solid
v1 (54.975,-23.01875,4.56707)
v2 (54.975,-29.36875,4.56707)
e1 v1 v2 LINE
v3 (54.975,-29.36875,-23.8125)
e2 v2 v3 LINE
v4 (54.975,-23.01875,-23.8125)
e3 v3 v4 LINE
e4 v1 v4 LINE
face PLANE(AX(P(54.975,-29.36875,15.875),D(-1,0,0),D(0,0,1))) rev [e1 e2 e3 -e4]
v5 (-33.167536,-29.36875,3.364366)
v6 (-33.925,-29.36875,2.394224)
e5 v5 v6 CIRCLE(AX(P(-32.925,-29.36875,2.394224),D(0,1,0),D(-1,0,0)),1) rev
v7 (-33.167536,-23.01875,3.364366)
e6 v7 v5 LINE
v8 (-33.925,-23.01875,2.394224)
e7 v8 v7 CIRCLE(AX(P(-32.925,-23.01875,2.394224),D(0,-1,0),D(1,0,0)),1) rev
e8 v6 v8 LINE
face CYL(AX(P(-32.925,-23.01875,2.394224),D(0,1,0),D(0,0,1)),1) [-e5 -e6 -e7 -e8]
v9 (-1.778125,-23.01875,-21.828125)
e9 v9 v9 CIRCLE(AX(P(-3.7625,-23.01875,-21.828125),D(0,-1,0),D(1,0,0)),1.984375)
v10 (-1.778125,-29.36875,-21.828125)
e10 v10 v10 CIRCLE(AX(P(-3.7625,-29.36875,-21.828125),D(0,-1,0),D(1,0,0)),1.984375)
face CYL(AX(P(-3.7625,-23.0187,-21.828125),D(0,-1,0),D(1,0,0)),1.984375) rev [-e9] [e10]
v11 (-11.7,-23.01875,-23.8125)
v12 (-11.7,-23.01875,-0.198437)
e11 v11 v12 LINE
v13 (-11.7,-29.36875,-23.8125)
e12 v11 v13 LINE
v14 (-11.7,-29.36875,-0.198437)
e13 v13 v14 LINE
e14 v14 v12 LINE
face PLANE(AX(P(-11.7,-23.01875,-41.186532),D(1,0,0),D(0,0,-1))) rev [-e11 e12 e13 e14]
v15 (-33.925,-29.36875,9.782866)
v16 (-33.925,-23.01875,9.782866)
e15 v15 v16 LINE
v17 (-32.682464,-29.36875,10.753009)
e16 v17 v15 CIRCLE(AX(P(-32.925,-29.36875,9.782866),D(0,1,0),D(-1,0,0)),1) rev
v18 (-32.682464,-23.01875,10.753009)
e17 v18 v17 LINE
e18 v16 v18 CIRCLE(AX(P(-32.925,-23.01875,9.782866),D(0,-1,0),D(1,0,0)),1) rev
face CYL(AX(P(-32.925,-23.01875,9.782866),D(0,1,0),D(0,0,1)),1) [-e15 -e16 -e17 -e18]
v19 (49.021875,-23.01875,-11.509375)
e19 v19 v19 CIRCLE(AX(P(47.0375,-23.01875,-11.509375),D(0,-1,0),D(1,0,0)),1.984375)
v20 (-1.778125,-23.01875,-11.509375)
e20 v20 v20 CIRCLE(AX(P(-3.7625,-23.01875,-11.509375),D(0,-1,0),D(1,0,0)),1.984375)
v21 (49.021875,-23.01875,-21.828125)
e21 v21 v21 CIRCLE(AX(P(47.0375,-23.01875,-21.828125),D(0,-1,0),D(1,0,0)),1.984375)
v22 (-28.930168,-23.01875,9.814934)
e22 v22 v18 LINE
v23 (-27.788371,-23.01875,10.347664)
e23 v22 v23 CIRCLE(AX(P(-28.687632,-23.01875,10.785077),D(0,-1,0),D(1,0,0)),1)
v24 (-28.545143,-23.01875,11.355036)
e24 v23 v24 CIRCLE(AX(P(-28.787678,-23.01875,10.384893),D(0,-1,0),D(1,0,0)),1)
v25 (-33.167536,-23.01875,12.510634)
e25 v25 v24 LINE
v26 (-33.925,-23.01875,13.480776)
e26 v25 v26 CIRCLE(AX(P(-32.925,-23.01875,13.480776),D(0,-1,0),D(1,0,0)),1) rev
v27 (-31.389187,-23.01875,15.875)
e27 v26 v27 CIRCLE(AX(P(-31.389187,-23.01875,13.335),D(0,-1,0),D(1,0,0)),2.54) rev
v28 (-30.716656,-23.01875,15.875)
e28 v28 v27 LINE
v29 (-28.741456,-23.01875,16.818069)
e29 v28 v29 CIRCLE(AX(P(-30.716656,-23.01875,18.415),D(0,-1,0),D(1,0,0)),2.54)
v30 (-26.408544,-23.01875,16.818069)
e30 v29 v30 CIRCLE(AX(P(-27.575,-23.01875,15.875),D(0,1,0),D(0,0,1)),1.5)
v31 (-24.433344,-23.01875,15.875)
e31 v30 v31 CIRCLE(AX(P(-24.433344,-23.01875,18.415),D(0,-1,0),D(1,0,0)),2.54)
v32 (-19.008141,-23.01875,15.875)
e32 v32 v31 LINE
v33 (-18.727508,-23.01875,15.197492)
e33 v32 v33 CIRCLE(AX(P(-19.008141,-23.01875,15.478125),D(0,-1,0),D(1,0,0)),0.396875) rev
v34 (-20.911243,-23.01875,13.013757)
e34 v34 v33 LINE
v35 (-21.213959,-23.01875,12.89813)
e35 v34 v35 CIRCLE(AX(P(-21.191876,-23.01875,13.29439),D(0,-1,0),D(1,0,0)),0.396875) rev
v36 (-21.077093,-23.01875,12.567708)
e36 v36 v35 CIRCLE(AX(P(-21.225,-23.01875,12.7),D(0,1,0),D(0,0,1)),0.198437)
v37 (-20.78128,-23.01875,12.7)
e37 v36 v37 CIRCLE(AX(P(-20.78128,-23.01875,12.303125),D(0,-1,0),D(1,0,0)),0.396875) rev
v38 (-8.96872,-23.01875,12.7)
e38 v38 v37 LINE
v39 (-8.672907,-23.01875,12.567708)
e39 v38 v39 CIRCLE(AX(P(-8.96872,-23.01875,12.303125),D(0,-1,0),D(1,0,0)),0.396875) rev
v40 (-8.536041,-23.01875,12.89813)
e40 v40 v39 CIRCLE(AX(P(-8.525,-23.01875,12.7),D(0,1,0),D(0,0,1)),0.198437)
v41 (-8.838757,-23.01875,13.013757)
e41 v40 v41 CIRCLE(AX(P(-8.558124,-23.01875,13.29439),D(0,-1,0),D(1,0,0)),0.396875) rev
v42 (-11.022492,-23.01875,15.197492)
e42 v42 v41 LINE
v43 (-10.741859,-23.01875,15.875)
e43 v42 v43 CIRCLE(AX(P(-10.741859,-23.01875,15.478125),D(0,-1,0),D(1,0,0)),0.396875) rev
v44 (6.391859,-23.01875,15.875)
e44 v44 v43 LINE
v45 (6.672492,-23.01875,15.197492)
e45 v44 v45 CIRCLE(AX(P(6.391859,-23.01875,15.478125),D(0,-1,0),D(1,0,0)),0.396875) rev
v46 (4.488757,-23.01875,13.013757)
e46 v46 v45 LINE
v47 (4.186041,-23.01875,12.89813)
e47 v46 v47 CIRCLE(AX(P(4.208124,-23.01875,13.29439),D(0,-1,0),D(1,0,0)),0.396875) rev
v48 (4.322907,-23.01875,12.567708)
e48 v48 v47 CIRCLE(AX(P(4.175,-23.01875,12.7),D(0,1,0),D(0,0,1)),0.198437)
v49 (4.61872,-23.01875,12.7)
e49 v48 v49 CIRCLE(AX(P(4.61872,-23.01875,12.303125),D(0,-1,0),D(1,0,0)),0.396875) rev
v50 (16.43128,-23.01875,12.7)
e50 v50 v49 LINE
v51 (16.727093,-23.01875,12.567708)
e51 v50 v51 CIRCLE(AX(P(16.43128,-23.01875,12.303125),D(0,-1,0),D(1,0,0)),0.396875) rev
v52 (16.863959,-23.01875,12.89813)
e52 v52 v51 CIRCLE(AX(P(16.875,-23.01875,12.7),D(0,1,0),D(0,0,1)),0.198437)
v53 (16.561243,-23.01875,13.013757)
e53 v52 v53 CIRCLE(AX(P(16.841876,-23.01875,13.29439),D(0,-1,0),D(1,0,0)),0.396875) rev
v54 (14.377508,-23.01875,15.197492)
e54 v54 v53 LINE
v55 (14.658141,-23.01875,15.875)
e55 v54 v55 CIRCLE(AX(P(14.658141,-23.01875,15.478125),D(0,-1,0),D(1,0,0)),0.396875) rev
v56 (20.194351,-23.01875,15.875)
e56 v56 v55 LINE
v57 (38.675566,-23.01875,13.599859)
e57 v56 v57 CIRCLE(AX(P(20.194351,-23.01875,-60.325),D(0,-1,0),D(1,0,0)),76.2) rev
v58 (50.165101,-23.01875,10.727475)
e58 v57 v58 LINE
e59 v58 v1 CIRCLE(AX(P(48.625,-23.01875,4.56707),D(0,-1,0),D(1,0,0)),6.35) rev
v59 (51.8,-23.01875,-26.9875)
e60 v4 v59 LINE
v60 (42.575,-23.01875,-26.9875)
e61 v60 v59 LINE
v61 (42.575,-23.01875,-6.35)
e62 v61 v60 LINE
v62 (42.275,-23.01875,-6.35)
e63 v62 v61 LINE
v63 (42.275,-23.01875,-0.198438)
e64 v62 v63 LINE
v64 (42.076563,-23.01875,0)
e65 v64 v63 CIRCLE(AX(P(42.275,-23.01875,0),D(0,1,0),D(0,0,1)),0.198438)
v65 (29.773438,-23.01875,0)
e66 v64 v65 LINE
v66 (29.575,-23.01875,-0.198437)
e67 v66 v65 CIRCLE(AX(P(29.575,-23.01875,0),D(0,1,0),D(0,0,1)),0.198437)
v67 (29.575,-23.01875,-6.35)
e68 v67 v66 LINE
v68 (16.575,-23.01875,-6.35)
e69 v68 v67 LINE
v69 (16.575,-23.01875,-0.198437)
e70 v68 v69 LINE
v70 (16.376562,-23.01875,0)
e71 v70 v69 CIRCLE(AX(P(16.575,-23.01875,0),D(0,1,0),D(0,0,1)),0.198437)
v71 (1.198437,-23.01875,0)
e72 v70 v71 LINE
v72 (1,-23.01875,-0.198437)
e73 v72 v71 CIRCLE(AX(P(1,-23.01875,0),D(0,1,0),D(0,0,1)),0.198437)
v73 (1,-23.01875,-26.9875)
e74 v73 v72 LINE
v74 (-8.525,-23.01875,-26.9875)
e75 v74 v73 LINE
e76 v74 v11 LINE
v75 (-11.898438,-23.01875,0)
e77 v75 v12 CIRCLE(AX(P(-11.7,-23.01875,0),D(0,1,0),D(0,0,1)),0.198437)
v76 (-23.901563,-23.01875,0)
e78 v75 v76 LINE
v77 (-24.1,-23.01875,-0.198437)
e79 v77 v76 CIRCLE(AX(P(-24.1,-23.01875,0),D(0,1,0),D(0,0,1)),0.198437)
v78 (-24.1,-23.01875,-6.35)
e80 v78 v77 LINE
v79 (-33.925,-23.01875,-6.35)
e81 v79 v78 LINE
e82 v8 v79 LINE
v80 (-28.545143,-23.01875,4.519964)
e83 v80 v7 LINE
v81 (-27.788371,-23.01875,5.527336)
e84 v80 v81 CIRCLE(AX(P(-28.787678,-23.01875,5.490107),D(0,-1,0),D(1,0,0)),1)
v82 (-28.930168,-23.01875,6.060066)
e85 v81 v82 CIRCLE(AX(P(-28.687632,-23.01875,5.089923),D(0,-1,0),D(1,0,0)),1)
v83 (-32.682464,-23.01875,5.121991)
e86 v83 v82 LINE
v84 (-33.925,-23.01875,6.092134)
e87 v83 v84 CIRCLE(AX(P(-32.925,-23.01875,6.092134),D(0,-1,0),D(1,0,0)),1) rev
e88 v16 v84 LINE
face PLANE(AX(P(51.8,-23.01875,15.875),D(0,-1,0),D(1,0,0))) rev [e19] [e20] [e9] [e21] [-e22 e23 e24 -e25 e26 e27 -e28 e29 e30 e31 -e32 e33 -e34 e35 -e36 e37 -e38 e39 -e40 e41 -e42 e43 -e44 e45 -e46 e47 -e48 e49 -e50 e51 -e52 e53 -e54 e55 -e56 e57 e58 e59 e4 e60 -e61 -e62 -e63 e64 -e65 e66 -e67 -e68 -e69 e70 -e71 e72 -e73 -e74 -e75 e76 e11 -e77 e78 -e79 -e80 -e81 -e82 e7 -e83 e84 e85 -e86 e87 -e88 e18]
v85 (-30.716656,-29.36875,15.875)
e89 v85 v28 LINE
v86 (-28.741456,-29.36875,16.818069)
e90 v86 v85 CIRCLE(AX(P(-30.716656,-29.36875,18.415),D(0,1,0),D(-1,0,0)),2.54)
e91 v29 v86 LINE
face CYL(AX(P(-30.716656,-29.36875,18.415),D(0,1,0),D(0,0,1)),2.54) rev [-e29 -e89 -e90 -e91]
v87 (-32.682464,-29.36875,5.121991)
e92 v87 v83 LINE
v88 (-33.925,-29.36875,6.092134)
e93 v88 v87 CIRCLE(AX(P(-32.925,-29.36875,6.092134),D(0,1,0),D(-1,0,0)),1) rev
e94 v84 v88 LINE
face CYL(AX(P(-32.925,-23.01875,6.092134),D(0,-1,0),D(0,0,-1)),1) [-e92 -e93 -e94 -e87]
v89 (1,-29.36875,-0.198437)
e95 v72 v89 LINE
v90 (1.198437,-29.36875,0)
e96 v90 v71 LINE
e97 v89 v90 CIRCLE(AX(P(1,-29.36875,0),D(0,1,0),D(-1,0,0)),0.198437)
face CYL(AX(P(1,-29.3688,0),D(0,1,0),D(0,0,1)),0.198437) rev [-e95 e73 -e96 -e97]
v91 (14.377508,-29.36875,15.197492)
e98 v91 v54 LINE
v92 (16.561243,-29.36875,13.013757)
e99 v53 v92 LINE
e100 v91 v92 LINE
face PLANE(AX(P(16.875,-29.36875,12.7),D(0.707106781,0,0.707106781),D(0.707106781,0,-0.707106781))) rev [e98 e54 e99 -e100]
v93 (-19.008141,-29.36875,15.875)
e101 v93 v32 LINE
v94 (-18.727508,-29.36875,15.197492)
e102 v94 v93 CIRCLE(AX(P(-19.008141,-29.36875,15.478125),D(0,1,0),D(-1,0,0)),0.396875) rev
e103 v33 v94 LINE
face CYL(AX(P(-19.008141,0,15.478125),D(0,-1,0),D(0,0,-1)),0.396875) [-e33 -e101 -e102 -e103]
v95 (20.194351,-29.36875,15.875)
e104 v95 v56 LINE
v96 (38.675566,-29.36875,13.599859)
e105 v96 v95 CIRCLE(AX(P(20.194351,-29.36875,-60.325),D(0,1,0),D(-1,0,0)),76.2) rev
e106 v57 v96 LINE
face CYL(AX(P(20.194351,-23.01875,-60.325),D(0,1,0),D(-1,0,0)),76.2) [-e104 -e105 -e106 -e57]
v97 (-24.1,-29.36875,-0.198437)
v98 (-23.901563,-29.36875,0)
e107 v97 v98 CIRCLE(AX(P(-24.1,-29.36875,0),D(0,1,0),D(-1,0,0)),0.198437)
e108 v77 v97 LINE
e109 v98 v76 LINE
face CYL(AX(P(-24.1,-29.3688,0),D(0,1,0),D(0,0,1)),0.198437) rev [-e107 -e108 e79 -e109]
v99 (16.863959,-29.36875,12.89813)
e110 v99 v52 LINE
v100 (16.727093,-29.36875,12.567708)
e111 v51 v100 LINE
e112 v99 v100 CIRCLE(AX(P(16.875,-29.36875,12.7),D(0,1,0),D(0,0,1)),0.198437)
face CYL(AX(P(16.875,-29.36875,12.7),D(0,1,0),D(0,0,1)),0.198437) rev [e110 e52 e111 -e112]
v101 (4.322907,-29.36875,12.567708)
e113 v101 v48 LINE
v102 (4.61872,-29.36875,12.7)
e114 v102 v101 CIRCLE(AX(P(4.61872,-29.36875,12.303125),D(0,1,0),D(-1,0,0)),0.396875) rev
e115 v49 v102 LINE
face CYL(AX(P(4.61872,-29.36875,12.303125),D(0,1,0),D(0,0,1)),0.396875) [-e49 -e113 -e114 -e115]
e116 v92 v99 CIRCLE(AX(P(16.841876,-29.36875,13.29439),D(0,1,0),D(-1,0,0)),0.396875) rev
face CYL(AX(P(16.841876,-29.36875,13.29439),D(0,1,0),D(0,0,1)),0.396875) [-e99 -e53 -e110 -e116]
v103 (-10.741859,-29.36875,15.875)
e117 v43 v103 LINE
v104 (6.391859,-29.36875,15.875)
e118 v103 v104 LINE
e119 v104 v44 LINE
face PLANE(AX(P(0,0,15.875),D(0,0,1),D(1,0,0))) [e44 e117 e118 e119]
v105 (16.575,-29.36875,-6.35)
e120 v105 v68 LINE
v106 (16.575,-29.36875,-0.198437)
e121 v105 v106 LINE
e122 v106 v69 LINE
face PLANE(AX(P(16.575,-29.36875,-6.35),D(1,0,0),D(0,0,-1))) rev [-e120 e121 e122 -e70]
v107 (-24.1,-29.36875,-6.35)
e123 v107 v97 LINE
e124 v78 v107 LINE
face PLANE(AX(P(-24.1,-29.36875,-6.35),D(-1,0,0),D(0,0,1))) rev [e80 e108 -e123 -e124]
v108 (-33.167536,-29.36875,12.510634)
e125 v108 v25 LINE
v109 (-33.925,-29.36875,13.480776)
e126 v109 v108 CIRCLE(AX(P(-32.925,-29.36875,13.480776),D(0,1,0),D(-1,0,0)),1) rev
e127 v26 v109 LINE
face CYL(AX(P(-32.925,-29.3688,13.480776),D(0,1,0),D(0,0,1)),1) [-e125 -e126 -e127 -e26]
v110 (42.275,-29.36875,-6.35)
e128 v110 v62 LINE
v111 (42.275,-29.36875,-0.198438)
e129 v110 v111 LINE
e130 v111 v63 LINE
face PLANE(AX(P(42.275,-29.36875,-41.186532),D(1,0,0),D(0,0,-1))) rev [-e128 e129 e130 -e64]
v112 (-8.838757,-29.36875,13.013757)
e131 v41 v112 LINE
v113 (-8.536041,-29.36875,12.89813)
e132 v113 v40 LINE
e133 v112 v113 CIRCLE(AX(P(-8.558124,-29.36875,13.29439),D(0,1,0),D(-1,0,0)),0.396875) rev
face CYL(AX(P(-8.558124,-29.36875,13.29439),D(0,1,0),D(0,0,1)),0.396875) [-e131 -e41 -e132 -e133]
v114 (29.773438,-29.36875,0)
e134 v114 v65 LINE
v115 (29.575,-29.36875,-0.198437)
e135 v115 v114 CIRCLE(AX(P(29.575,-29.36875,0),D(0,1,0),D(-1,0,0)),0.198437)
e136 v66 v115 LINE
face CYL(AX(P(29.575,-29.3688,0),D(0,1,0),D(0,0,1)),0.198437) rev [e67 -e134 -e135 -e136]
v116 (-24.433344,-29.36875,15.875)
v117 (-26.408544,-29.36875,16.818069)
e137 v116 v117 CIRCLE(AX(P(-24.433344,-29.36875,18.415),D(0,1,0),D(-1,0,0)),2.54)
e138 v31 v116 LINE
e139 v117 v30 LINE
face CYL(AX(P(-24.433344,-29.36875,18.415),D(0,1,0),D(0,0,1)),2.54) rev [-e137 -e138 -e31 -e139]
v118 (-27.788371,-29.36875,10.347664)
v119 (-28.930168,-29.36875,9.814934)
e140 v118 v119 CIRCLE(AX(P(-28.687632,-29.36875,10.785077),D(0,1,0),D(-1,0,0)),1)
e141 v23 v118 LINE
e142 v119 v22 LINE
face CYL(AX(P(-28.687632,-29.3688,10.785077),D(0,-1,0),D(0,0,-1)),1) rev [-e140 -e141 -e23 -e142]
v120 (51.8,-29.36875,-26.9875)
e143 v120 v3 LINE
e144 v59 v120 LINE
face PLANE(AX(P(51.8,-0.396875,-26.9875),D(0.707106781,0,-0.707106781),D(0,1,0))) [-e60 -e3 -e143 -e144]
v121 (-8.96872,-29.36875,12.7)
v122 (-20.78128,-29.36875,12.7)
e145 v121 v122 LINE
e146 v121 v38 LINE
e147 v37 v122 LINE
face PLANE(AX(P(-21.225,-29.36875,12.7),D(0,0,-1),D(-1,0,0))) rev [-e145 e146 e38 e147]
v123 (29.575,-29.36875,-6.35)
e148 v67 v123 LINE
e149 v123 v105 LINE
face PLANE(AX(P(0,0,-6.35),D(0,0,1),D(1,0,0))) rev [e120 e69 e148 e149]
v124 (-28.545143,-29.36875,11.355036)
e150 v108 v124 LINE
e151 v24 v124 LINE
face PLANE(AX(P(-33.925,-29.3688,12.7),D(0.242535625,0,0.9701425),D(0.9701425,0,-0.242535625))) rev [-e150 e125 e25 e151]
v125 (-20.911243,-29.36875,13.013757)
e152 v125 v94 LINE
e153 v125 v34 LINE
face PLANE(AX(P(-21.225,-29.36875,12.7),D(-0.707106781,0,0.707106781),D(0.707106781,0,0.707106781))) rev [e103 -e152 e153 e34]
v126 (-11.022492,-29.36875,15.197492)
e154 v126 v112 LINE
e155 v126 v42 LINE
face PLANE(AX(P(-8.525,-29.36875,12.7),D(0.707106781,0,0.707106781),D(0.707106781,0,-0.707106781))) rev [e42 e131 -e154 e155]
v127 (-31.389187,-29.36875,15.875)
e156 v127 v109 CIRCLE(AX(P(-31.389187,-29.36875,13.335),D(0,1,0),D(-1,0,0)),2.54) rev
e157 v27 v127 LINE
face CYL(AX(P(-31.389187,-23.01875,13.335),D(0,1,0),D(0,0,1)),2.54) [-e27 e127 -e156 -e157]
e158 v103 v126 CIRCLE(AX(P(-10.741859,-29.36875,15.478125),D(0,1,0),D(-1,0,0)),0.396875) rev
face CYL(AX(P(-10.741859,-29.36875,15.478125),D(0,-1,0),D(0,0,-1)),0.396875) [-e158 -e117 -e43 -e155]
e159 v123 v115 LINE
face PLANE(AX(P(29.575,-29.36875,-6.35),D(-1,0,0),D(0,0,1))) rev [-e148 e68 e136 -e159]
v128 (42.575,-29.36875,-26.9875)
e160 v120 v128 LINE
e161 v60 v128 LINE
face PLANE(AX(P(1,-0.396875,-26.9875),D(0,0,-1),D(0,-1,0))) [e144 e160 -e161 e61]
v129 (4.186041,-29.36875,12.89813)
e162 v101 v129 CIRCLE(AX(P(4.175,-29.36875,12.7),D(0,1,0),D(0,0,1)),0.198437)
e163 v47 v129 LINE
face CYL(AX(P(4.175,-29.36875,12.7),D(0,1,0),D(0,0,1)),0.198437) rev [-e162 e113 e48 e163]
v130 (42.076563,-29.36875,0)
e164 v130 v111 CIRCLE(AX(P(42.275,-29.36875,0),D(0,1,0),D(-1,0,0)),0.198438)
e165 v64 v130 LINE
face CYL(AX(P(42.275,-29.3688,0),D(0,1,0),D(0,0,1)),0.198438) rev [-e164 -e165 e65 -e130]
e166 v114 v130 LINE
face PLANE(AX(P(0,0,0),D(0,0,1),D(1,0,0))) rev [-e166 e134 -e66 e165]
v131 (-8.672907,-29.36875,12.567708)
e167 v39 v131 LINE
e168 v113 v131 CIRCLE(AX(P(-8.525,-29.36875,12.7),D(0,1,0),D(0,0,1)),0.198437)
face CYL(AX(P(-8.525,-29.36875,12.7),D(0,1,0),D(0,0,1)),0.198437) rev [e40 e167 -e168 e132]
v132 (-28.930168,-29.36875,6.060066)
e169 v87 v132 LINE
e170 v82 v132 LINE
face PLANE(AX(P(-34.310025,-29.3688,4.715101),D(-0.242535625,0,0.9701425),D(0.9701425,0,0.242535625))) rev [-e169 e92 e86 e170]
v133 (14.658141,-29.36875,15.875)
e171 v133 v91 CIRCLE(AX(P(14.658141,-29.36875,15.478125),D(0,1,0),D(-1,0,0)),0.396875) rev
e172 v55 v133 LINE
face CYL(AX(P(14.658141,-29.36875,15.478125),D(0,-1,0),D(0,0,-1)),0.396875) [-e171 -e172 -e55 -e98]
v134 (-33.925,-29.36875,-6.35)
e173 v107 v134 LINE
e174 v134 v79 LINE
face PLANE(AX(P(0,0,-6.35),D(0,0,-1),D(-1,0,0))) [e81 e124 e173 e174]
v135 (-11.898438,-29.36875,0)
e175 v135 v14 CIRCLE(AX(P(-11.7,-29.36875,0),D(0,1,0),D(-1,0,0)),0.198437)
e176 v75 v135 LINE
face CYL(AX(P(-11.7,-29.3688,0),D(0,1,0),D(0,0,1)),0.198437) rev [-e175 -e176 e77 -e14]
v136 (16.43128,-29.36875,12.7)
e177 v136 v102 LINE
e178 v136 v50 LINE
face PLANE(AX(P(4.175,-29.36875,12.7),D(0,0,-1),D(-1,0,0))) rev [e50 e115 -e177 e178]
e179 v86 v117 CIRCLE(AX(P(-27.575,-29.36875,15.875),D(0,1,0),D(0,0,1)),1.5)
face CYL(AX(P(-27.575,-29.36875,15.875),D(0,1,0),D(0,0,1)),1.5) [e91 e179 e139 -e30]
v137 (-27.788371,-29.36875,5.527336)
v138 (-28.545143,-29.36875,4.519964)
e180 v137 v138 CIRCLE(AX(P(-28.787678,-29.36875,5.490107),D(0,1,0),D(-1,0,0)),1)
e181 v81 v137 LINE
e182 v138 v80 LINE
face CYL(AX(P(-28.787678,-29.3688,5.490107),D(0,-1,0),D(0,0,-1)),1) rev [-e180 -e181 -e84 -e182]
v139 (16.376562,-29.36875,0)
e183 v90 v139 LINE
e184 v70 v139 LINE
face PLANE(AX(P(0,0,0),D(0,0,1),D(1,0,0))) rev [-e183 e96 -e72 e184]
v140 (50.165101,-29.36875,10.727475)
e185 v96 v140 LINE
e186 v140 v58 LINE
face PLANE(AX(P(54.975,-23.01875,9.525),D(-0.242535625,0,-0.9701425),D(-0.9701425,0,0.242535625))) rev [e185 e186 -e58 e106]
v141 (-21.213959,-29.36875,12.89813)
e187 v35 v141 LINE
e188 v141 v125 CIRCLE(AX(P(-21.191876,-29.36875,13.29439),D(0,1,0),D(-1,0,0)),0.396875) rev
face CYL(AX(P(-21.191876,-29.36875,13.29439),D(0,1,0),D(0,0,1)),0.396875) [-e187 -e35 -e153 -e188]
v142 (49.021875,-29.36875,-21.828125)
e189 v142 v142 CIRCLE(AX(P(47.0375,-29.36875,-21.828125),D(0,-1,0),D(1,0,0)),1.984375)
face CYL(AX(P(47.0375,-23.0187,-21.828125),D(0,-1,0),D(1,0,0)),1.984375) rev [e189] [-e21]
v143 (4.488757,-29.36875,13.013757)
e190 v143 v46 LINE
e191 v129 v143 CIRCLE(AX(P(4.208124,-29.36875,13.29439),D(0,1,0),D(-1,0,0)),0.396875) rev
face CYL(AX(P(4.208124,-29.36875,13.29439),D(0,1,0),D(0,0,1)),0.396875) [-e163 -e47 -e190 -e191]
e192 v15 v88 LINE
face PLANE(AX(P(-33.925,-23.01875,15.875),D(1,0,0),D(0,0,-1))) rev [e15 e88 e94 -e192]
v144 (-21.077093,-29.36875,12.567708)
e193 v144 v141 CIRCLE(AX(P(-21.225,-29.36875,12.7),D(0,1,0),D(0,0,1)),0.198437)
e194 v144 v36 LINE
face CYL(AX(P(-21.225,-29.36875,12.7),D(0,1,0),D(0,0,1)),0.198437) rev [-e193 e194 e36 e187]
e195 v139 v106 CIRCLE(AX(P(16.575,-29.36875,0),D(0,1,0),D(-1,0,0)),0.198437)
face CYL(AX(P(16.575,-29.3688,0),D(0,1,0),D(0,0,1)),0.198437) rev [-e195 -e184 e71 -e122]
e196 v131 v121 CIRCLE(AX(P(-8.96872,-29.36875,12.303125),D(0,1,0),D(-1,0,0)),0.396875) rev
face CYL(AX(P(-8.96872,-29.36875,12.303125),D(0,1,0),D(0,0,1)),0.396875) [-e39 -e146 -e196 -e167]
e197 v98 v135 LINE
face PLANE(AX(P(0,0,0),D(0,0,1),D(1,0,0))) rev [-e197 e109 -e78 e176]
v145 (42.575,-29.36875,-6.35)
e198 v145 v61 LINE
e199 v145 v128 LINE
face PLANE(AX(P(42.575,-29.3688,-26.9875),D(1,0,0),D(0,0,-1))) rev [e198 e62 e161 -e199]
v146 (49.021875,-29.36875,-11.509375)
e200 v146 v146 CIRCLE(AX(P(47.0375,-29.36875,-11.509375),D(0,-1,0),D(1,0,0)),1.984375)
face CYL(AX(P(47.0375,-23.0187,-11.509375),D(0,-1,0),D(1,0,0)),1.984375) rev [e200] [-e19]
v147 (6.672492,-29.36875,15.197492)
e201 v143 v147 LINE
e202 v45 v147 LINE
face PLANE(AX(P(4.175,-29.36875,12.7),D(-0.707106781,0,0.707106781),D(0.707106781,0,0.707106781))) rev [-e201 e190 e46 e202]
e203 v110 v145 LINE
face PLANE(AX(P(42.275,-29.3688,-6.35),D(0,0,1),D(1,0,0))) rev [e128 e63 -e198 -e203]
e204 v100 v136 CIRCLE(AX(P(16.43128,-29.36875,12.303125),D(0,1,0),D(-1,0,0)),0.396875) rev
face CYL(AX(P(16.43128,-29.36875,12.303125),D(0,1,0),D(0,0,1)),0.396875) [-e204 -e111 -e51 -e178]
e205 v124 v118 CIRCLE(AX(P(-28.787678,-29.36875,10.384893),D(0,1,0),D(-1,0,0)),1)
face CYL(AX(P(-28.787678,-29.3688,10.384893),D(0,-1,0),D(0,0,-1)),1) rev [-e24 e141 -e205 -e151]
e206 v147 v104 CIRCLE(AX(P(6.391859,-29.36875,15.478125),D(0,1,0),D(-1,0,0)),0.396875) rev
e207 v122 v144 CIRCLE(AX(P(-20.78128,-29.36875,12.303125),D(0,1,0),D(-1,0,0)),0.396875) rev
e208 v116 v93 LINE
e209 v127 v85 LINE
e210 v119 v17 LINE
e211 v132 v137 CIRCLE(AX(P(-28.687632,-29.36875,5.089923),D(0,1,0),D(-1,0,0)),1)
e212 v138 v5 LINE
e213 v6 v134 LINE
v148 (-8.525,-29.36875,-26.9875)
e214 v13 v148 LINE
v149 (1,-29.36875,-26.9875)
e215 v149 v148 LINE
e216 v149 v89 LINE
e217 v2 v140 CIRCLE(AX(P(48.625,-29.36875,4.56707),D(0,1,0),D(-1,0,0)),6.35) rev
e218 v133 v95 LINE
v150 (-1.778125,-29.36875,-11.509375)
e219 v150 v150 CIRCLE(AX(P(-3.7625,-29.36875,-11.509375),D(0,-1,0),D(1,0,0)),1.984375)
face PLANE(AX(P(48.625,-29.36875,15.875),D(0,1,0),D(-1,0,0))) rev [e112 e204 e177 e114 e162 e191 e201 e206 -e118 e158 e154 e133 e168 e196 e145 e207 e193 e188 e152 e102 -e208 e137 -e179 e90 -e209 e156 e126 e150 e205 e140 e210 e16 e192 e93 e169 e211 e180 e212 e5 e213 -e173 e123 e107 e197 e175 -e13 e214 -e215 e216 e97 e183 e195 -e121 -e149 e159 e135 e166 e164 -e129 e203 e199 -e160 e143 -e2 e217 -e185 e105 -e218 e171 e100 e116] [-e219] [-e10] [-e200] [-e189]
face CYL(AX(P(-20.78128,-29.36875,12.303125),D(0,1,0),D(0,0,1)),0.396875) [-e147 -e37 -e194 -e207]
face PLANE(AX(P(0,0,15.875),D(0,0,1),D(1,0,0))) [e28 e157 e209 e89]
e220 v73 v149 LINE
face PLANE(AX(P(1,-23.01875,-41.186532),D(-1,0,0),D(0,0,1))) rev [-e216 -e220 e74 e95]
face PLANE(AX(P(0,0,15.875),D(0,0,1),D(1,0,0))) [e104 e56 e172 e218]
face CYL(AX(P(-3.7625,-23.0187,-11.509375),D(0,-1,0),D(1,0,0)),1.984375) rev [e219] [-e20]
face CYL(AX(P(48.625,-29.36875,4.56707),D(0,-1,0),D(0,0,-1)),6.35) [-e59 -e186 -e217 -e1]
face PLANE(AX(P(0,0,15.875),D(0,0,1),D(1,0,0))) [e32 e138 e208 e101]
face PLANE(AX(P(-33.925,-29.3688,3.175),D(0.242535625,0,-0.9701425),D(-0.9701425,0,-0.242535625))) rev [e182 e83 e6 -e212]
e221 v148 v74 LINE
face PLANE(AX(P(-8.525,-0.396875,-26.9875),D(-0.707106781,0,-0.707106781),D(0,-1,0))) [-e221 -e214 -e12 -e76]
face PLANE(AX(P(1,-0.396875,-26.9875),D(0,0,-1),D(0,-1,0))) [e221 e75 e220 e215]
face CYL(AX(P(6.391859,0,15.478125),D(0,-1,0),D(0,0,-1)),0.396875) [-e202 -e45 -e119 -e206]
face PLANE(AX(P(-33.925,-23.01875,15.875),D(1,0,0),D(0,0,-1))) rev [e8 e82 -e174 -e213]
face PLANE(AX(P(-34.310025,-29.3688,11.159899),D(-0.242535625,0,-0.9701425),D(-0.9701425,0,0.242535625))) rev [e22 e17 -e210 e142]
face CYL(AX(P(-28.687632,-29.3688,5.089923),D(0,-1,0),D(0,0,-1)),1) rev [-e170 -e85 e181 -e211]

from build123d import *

# Parameters (mm, degrees)
BOSS_EXTRUDE1_DEPTH = 15.875
SKETCH3_W           = 12.7
SKETCH3_H           = 6.35
BOSS_EXTRUDE2_DEPTH = 26.9875
SKETCH5_R           = 1.5
BOSS_EXTRUDE4_DEPTH = 6.35
FILLET1_R           = 2.54
CUT_EXTRUDE1_DEPTH  = 62.570271083
FILLET3_R           = 1
CUT_EXTRUDE2_DEPTH  = 6.35
FILLET4_R           = 6.35
FILLET5_R           = 76.2
SKETCH8_W           = 9.825
SKETCH8_H           = 6.35
BOSS_EXTRUDE5_DEPTH = 6.35
SKETCH9_W           = 0.299999908
SKETCH9_H           = 20.6375
CUT_EXTRUDE3_DEPTH  = 62.570271083
FILLET6_R           = 2.54
FILLET7_R           = 2.54
SKETCH10_R          = 1.984375
CUT_EXTRUDE4_DEPTH  = 62.570271083
CHAMFER1_SIZE       = 3.175
SKETCH11_W          = 13
SKETCH11_H          = 6.35
BOSS_EXTRUDE6_DEPTH = 6.35
SKETCH12_R          = 0.1984375
CUT_EXTRUDE5_DEPTH  = 62.570271083
CUT_EXTRUDE6_DEPTH  = 6.35
FILLET8_R           = 0.396875
SKETCH14_R          = 0.1984375
CUT_EXTRUDE7_DEPTH  = 62.570271083
FILLET9_R           = 0.396875


with BuildPart() as part:
    # Sketch2 → Boss-Extrude1 (new body)
    with BuildSketch(Plane.XY):
        Polygon((51.8, -23.01875), (-33.925, -23.01875), (-33.925, -29.36875), (48.625, -29.36875), (54.975, -29.36875), (54.975, -23.01875), align=None)
    extrude(amount=BOSS_EXTRUDE1_DEPTH)

    # Sketch3 → Boss-Extrude2 (add)
    with BuildSketch(Plane(origin=(0, 0, 0), x_dir=(-1, 0, 0), z_dir=(0, 0, -1))):
        with Locations((5.35, -26.19375)):
            Rectangle(SKETCH3_W, SKETCH3_H)
        with Locations((-48.625, -26.19375)):
            Rectangle(SKETCH3_W, SKETCH3_H)
    extrude(amount=BOSS_EXTRUDE2_DEPTH)

    # Sketch5 → Boss-Extrude4 (add)
    with BuildSketch(Plane(origin=(0, -23.01875, 0), x_dir=(1, 0, 0), z_dir=(0, 1, 0))):
        with Locations((-27.575, -15.875)):
            Circle(SKETCH5_R)
    extrude(amount=-BOSS_EXTRUDE4_DEPTH)

    # Fillet1
    fillet1_edges = [part.edges().sort_by_distance(p)[0] for p in [
        (-26.075, -26.19375, 15.875),
    ]]
    fillet(fillet1_edges, radius=FILLET1_R)

    # Sketch6 → Cut-Extrude1 (cut, through all)
    with BuildSketch(Plane(origin=(0, -23.01875, 0), x_dir=(1, 0, 0), z_dir=(0, 1, 0))):
        Polygon((-33.925, -3.175), (-27.575, -4.7625), (-27.960025305, -6.302601219), (-34.310025305, -4.715101219), align=None)
        Polygon((-33.925, -12.7), (-27.575, -11.1125), (-27.960025305, -9.572398781), (-34.310025305, -11.159898781), align=None)
    extrude(amount=-CUT_EXTRUDE1_DEPTH, mode=Mode.SUBTRACT)

    # Fillet3
    # the kernel refuses this fillet: 1 mm, written as the material it adds along each edge
    with BuildSketch(Plane(origin=(-27.575, -23.01875, 11.1125), x_dir=(-0.24253562503632964, 0, -0.9701425001453328), z_dir=(0, -1, 0)), Plane(origin=(-27.960025305, -23.01875, 9.572398781), x_dir=(-0.970142500145332, 0, 0.242535625036333), z_dir=(0, -1, 0)), Plane(origin=(-27.960025305, -23.01875, 6.302601219), x_dir=(0.24253562503633191, 0, -0.9701425001453321), z_dir=(0, -1, 0)), Plane(origin=(-27.575, -23.01875, 4.7625), x_dir=(-0.9701425001453318, 0, -0.24253562503633383), z_dir=(0, -1, 0))) as fillet3_piece_1:
        with BuildLine():
            CenterArc((FILLET3_R, -FILLET3_R), FILLET3_R, 90, 90)
            Line((0, -FILLET3_R), (0, 0))
            Line((0, 0), (FILLET3_R, 0))
        make_face()
    extrude(amount=6.35)
    # the kernel refuses this fillet: 1 mm, written as the material it takes off along each edge
    with BuildSketch(Plane(origin=(-33.925, -21.066808984, 3.175), x_dir=(0, 0, -1), z_dir=(0, -1, 0)), Plane(origin=(-33.925, -21.066808984, 12.7), x_dir=(0.9701425001453319, 0, -0.24253562503633297), z_dir=(0, -1, 0))) as fillet3_2_piece_1:
        with BuildLine():
            CenterArc((FILLET3_R * 0.780776406404, FILLET3_R), FILLET3_R, 194.036243468, 75.963756532)
            Line((-FILLET3_R * 0.189366093741, FILLET3_R * 0.757464374964), (0, 0))
            Line((0, 0), (FILLET3_R * 0.780776406404, 0))
        make_face()
    extrude(amount=10.253882032, mode=Mode.SUBTRACT)
    with BuildSketch(Plane(origin=(-33.925, -32.570691016, 4.811357545), x_dir=(0.9701425001453321, 0, 0.24253562503633233), z_dir=(0, 1, 0)), Plane(origin=(-33.925, -32.570691016, 11.063642455), x_dir=(0, 0, -1), z_dir=(0, 1, 0))) as fillet3_2_piece_2:
        with BuildLine():
            CenterArc((FILLET3_R * 1.2807764064, -FILLET3_R), FILLET3_R, 90, 104.036243468)
            Line((FILLET3_R * 0.310633906259, -FILLET3_R * 1.24253562504), (0, 0))
            Line((0, 0), (FILLET3_R * 1.2807764064, 0))
        make_face()
    extrude(amount=12.753882032, mode=Mode.SUBTRACT)

    # Sketch7 → Cut-Extrude2 (cut)
    with BuildSketch(Plane(origin=(0, -29.36875, 0), x_dir=(-1, 0, 0), z_dir=(0, -1, 0))):
        Polygon((-54.975, -15.875), (-54.975, -9.525), (-29.575, -15.875), align=None)
    extrude(amount=-CUT_EXTRUDE2_DEPTH, mode=Mode.SUBTRACT)

    # Fillet4
    fillet4_edges = [part.edges().sort_by_distance(p)[0] for p in [
        (54.975, -26.19375, 9.525),
    ]]
    fillet(fillet4_edges, radius=FILLET4_R)

    # Fillet5
    fillet5_edges = [part.edges().sort_by_distance(p)[0] for p in [
        (29.575, -26.19375, 15.875),
    ]]
    fillet(fillet5_edges, radius=FILLET5_R)

    # Sketch8 → Boss-Extrude5 (add)
    with BuildSketch(Plane(origin=(0, 0, 0), x_dir=(-1, 0, 0), z_dir=(0, 0, -1))):
        with Locations((29.0125, -26.19375)):
            Rectangle(SKETCH8_W, SKETCH8_H)
    extrude(amount=BOSS_EXTRUDE5_DEPTH)

    # Sketch9 → Cut-Extrude3 (cut, through all)
    with BuildSketch(Plane(origin=(0, -23.01875, 0), x_dir=(1, 0, 0), z_dir=(0, 1, 0))):
        with Locations((42.424999954, 16.66875)):
            Rectangle(SKETCH9_W, SKETCH9_H)
    extrude(amount=-CUT_EXTRUDE3_DEPTH, mode=Mode.SUBTRACT)

    # Fillet6
    fillet6_edges = [part.edges().sort_by_distance(p)[0] for p in [
        (-29.075, -26.19375, 15.875),
    ]]
    fillet(fillet6_edges, radius=FILLET6_R)

    # Fillet7
    # the kernel refuses this fillet: 2.54 mm, written as the material it takes off along each edge
    with BuildSketch(Plane(origin=(-33.925, -16.679216678, 15.875), x_dir=(1, 0, 0), z_dir=(0, -1, 0))) as fillet7_piece_1:
        with BuildLine():
            CenterArc((2.535813329, -2.54), FILLET7_R, 90, 86.709856328)
            Line((0, -2.394223594), (-0.050716267, -2.391308065))
            ThreePointArc((-0.050716267, -2.391308065), (-0.0508, -1.197111797), (-0.0508, 0))
            Line((-0.0508, 0), (0, 0.0508))
            Line((0, 0.0508), (2.535813329, 0.0508))
            Line((2.535813329, 0.0508), (2.535813329, 0))
        make_face()
    extrude(amount=19.029066645, mode=Mode.SUBTRACT)

    # Sketch10 → Cut-Extrude4 (cut, through all)
    with BuildSketch(Plane(origin=(0, -29.36875, 0), x_dir=(-1, 0, 0), z_dir=(0, -1, 0))):
        with Locations(Location((-47.0375, 21.828125, 0), (0, 0, 180))):
            Circle(SKETCH10_R)
        with Locations(Location((-47.0375, 11.509375, 0), (0, 0, 180))):
            Circle(SKETCH10_R)
        with Locations(Location((3.7625, 11.509375, 0), (0, 0, 180))):
            Circle(SKETCH10_R)
        with Locations(Location((3.7625, 21.828125, 0), (0, 0, 180))):
            Circle(SKETCH10_R)
    extrude(amount=-CUT_EXTRUDE4_DEPTH, mode=Mode.SUBTRACT)

    # Chamfer1
    chamfer1_edges = [part.edges().sort_by_distance(p)[0] for p in [
        (54.975, -26.19375, -26.9875),
        (-11.7, -26.19375, -26.9875),
    ]]
    chamfer(chamfer1_edges, length=CHAMFER1_SIZE)

    # Sketch11 → Boss-Extrude6 (add)
    with BuildSketch(Plane(origin=(0, 0, 0), x_dir=(-1, 0, 0), z_dir=(0, 0, -1))):
        with Locations((-23.075, -26.19375)):
            Rectangle(SKETCH11_W, SKETCH11_H)
    extrude(amount=BOSS_EXTRUDE6_DEPTH)

    # Sketch12 → Cut-Extrude5 (cut, through all)
    with BuildSketch(Plane(origin=(0, -23.01875, 0), x_dir=(1, 0, 0), z_dir=(0, 1, 0))):
        with Locations((-24.1, 0)):
            Circle(SKETCH12_R)
        with Locations((-11.7, 0)):
            Circle(SKETCH12_R)
        with Locations((1, 0)):
            Circle(SKETCH12_R)
        with Locations((16.575, 0)):
            Circle(SKETCH12_R)
        with Locations((29.575, 0)):
            Circle(SKETCH12_R)
        with Locations((42.275, 0)):
            Circle(SKETCH12_R)
    extrude(amount=-CUT_EXTRUDE5_DEPTH, mode=Mode.SUBTRACT)

    # Sketch13 → Cut-Extrude6 (cut)
    with BuildSketch(Plane(origin=(0, -23.01875, 0), x_dir=(1, 0, 0), z_dir=(0, 1, 0))):
        Polygon((-21.225, -12.7), (-8.525, -12.7), (-11.7, -15.875), (-18.05, -15.875), align=None)
        Polygon((16.875, -12.7), (13.7, -15.875), (7.35, -15.875), (4.175, -12.7), align=None)
    extrude(amount=-CUT_EXTRUDE6_DEPTH, mode=Mode.SUBTRACT)

    # Fillet8
    fillet8_edges = [part.edges().sort_by_distance(p)[0] for p in [
        (-18.05, -26.19375, 15.875),
        (-11.7, -26.19375, 15.875),
        (7.35, -26.19375, 15.875),
        (13.7, -26.19375, 15.875),
    ]]
    fillet(fillet8_edges, radius=FILLET8_R)

    # Sketch14 → Cut-Extrude7 (cut, through all)
    with BuildSketch(Plane(origin=(0, -23.01875, 0), x_dir=(1, 0, 0), z_dir=(0, 1, 0))):
        with Locations((-21.225, -12.7)):
            Circle(SKETCH14_R)
        with Locations((-8.525, -12.7)):
            Circle(SKETCH14_R)
        with Locations((4.175, -12.7)):
            Circle(SKETCH14_R)
        with Locations((16.875, -12.7)):
            Circle(SKETCH14_R)
    extrude(amount=-CUT_EXTRUDE7_DEPTH, mode=Mode.SUBTRACT)

    # Fillet9
    fillet9_edges = [part.edges().sort_by_distance(p)[0] for p in [
        (-21.0265625, -26.19375, 12.7),
        (-21.084683498, -26.19375, 12.840316502),
        (-8.665316502, -26.19375, 12.840316502),
        (-8.7234375, -26.19375, 12.7),
        (4.3734375, -26.19375, 12.7),
        (4.315316502, -26.19375, 12.840316502),
        (16.734683498, -26.19375, 12.840316502),
        (16.6765625, -26.19375, 12.7),
    ]]
    fillet(fillet9_edges, radius=FILLET9_R)


solid = part.part
